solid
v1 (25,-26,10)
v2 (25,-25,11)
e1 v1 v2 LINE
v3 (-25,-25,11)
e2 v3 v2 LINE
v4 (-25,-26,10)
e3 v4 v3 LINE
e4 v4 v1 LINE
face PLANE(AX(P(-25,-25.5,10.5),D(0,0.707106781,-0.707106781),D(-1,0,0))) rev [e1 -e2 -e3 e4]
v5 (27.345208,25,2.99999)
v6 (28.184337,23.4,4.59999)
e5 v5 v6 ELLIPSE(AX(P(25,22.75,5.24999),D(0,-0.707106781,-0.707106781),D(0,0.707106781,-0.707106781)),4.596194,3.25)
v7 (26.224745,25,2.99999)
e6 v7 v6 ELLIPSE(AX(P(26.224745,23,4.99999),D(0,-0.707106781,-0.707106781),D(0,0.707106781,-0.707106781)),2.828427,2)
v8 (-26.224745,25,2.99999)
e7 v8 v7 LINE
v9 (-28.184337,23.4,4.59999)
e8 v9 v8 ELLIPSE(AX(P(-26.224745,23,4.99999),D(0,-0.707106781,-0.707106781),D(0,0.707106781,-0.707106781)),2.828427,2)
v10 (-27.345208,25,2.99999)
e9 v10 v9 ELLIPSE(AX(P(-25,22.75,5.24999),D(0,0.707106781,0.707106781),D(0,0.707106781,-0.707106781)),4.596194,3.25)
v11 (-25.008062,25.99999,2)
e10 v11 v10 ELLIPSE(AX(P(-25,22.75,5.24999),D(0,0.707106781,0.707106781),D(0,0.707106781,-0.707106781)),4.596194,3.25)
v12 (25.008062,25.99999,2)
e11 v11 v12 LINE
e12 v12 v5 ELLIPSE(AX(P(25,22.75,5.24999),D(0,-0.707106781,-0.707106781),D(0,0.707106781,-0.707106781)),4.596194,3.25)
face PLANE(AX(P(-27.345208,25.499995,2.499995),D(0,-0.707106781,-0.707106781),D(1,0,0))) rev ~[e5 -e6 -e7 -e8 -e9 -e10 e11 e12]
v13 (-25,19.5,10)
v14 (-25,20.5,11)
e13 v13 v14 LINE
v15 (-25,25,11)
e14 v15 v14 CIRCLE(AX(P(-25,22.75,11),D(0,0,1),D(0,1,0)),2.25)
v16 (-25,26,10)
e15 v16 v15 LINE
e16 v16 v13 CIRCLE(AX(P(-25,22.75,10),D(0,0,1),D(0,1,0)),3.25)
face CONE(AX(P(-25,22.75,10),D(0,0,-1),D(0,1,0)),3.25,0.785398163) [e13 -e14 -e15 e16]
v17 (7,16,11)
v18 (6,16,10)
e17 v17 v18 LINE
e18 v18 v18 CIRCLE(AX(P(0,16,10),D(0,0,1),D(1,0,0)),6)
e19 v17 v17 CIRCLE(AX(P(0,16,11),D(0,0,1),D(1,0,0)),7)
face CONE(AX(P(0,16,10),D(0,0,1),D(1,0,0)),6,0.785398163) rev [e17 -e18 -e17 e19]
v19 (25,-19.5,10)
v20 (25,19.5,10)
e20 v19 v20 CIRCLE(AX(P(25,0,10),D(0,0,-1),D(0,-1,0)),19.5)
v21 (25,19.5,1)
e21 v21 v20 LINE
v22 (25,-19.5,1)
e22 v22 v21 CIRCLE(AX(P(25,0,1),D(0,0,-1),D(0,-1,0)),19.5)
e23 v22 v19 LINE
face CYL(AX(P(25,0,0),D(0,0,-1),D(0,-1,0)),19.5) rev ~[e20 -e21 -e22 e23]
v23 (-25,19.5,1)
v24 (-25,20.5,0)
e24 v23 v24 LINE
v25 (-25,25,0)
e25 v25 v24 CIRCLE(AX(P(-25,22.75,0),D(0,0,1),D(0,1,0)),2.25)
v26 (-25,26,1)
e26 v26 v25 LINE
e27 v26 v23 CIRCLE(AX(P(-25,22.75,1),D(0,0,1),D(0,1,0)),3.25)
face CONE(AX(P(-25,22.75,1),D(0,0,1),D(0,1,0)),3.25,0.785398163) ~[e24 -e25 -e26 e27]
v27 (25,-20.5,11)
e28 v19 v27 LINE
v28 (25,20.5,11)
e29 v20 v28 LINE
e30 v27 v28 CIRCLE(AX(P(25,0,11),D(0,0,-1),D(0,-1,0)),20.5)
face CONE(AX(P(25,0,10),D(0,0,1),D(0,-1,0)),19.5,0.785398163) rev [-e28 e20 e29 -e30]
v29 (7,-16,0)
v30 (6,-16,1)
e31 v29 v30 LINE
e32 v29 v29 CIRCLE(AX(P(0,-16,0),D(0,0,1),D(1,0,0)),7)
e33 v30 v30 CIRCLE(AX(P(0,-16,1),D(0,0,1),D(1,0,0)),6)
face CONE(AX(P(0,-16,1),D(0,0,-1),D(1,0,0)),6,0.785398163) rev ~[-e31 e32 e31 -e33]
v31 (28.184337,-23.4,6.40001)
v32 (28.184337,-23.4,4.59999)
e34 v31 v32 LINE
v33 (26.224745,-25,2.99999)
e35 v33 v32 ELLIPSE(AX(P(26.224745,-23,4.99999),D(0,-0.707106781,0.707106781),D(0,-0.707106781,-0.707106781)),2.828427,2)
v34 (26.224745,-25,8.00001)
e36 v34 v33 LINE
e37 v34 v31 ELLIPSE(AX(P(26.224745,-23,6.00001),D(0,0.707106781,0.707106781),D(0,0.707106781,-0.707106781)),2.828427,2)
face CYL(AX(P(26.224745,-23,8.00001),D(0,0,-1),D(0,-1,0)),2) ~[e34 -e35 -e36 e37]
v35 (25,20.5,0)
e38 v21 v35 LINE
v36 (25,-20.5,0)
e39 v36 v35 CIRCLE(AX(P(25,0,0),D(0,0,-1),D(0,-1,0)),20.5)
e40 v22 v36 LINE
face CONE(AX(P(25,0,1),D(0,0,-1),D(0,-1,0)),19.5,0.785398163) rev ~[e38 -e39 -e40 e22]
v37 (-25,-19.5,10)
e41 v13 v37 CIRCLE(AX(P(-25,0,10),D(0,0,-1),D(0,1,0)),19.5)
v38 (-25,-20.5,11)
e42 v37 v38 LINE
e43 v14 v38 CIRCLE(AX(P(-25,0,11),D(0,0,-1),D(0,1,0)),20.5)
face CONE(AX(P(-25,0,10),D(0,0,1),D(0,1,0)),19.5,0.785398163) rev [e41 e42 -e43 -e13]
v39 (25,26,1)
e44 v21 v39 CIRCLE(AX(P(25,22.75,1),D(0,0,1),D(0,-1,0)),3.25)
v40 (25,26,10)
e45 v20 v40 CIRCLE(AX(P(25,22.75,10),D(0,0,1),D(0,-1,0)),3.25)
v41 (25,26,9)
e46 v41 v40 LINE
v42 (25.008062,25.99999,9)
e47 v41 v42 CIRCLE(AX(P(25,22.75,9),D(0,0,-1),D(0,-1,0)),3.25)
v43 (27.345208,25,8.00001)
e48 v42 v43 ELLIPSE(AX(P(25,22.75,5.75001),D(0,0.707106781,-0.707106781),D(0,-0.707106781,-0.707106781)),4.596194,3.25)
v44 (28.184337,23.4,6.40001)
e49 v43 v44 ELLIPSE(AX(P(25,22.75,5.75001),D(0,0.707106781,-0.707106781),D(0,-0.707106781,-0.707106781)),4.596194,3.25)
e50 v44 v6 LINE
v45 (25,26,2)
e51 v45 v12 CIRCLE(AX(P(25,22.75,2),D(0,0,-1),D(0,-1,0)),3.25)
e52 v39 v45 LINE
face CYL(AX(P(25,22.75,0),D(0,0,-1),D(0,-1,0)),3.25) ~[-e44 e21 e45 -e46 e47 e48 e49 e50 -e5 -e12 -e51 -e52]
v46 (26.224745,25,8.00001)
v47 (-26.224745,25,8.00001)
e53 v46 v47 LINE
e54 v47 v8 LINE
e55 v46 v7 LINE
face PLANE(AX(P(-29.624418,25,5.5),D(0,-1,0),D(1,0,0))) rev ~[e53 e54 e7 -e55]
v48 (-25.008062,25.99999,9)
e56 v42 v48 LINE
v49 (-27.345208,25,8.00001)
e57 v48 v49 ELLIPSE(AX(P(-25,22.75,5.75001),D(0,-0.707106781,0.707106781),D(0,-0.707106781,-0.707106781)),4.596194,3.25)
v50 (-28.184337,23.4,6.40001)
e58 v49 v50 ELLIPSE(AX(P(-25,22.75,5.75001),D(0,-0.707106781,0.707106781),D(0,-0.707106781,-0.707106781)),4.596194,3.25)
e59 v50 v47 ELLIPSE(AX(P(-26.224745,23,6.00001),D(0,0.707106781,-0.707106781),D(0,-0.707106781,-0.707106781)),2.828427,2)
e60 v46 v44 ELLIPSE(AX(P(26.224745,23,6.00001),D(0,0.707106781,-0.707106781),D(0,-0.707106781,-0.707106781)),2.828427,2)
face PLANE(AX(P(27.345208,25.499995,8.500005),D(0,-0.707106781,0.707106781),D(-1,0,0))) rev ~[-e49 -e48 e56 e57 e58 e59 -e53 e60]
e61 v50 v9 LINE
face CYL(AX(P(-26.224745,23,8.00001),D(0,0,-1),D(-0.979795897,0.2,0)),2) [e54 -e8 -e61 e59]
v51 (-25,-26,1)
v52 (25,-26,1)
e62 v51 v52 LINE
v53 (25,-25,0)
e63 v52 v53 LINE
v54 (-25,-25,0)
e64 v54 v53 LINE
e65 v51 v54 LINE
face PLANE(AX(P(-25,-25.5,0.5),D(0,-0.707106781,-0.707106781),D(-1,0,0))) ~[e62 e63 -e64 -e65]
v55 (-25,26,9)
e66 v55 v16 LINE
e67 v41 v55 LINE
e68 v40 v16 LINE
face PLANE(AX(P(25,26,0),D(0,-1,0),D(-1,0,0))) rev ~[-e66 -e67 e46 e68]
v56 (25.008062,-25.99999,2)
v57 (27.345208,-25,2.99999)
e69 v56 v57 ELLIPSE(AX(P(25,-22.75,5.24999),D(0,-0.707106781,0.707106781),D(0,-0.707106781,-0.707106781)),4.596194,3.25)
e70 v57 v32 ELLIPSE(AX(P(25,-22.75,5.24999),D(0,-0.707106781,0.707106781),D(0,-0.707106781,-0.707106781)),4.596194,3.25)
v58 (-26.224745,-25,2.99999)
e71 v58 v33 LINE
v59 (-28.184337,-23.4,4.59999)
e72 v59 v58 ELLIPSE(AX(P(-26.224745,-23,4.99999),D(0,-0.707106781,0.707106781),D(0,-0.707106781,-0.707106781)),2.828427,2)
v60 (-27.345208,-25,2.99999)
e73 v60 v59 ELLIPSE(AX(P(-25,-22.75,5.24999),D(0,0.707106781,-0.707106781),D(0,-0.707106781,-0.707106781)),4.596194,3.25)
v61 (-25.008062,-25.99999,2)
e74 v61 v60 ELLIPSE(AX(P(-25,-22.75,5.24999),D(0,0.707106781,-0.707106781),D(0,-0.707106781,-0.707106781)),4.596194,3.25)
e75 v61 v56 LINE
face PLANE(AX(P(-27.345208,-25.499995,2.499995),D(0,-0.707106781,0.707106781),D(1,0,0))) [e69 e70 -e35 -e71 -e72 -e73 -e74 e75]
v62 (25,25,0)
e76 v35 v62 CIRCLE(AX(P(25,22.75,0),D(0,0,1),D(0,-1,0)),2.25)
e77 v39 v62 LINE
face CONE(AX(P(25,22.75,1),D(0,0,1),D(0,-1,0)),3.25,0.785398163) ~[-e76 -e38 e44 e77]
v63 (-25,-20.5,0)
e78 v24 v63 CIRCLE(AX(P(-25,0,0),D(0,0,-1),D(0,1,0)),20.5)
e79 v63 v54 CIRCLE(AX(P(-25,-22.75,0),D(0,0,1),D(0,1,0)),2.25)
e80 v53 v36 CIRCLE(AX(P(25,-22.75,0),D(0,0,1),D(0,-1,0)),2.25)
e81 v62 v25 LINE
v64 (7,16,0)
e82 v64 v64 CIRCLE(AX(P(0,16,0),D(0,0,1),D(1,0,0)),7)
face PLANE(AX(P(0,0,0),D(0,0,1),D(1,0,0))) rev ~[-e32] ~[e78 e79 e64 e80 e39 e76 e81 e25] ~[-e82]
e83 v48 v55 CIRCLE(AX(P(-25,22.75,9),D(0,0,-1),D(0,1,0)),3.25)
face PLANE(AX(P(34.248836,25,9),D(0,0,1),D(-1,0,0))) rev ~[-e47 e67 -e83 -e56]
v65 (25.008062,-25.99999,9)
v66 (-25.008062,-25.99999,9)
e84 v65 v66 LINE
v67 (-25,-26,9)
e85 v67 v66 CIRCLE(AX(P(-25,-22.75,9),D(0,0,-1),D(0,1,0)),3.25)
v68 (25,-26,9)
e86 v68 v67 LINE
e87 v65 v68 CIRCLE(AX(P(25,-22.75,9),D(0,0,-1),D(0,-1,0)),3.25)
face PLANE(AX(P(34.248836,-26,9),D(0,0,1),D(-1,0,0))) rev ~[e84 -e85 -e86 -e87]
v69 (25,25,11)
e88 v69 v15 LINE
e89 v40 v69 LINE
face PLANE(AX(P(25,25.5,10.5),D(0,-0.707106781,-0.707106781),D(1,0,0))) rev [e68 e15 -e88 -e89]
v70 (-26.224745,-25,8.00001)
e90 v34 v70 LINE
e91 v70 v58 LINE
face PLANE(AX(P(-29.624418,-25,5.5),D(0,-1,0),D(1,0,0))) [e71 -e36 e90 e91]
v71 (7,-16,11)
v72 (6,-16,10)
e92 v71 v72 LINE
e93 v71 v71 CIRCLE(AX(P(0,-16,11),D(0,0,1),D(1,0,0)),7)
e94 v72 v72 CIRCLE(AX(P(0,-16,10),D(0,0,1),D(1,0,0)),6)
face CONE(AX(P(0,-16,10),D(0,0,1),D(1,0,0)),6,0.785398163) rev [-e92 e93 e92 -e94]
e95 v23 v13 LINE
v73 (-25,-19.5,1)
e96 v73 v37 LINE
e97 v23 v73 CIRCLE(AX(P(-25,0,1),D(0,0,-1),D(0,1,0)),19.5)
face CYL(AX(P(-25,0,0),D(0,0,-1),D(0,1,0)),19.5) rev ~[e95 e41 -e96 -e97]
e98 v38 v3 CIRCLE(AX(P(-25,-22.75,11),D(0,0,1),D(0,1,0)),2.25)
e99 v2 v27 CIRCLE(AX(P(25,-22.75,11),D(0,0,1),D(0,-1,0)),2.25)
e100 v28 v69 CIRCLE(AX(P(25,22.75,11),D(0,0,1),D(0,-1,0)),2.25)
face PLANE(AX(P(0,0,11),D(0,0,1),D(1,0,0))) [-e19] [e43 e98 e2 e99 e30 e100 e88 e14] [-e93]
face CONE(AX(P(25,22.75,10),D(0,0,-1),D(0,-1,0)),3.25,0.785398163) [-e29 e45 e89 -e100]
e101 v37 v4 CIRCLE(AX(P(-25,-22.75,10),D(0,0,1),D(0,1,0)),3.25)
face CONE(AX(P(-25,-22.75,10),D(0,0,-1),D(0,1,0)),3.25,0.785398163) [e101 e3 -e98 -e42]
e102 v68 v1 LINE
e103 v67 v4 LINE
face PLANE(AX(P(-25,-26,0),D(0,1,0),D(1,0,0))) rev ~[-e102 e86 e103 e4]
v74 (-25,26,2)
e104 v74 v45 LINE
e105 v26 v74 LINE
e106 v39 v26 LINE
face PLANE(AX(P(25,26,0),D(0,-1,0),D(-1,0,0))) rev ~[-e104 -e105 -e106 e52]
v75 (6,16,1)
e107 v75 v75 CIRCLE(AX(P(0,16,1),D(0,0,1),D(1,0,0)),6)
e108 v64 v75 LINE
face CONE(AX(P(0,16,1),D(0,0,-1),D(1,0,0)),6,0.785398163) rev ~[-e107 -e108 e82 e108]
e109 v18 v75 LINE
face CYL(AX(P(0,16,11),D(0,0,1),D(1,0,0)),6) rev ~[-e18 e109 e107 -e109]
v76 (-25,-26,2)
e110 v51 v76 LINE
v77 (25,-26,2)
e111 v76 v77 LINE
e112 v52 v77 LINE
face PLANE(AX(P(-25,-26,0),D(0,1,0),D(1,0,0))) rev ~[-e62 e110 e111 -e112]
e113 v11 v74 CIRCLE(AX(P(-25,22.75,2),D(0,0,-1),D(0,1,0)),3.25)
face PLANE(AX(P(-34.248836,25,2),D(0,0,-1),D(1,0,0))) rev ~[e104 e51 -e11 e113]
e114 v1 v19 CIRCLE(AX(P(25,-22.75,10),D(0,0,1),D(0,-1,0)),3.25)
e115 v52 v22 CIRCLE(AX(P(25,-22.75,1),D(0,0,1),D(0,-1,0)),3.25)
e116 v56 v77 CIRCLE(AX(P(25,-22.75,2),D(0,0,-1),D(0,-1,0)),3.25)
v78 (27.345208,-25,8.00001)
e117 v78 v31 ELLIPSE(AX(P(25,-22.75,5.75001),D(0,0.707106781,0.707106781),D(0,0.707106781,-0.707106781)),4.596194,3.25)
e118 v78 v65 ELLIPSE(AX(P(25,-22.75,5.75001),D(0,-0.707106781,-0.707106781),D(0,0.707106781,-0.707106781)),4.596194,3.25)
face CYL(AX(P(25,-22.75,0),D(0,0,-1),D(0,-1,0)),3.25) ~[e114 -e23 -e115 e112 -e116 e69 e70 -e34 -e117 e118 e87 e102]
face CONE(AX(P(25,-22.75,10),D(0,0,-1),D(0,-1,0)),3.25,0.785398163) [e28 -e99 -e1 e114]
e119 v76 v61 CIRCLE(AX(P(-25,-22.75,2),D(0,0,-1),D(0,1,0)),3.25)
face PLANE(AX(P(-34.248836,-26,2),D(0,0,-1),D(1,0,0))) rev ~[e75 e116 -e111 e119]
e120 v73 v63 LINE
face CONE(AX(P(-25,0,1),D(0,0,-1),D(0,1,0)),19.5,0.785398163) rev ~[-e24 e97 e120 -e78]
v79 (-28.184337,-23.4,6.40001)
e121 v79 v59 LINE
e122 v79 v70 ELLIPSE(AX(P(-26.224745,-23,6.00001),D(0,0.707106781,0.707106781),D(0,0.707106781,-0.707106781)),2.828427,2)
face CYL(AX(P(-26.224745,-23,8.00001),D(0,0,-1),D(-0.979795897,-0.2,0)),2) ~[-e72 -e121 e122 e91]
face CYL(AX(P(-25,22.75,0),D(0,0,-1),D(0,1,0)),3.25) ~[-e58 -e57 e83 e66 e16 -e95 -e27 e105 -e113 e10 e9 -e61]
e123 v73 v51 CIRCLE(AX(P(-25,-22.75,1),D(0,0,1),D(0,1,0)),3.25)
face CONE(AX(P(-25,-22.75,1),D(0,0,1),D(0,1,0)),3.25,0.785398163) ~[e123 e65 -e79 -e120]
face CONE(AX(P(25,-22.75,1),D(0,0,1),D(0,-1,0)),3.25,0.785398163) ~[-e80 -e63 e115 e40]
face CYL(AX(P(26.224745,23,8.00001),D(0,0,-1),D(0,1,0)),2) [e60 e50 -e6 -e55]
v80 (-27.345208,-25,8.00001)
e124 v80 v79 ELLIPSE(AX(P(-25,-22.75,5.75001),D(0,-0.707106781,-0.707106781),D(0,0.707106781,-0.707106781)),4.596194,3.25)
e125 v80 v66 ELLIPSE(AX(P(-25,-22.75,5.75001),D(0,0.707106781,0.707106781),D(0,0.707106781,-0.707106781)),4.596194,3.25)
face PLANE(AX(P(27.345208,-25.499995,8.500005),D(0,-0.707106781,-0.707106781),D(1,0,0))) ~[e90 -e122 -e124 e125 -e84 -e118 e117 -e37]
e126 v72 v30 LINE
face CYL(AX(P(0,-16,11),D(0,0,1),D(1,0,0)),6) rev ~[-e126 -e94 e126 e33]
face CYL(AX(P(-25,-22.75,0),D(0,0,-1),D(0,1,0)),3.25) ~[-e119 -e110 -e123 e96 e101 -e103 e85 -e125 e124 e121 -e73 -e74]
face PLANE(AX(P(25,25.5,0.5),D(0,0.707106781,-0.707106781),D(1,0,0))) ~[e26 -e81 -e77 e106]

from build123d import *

# Parameters (mm, degrees)
F1_DEPTH  = 11
F2_W      = 9.2488363385
F2_H      = 7
F2_W_2    = 50
F3_DEPTH  = 1
F6_SIZE   = 1
F7_SIZE   = 0.99999
F8_R      = 2
F9_R      = 6
F10_DEPTH = 11.001
F11_SIZE  = 1


# Not quite as in the source:
# - a fillet or chamfer is up to 0.001 mm smaller than in the source, because OpenCascade refuses the exact size


with BuildPart() as f1:
    # F0 (on Top) → F1 (new body)
    with BuildSketch(Plane.XY):
        with BuildLine():
            ThreePointArc((-25, 19.5), (-5.5, 0), (-25, -19.5))
            ThreePointArc((-25, -19.5), (-28.25, -22.75), (-25, -26))
            Line((-25, -26), (25, -26))
            ThreePointArc((25, -26), (28.25, -22.75), (25, -19.5))
            ThreePointArc((25, -19.5), (5.5, 0), (25, 19.5))
            ThreePointArc((25, 19.5), (28.25, 22.75), (25, 26))
            Line((25, 26), (-25, 26))
            ThreePointArc((-25, 26), (-28.25, 22.75), (-25, 19.5))
        make_face()
        with BuildLine():
            ThreePointArc((-25, -24), (-26.25, -22.75), (-25, -21.5))
            ThreePointArc((-25, -21.5), (-3.5, 0), (-25, 21.5))
            ThreePointArc((-25, 21.5), (-26.25, 22.75), (-25, 24))
            Line((-25, 24), (25, 24))
            ThreePointArc((25, 24), (26.25, 22.75), (25, 21.5))
            ThreePointArc((25, 21.5), (3.5, 0), (25, -21.5))
            ThreePointArc((25, -21.5), (26.25, -22.75), (25, -24))
            Line((25, -24), (-25, -24))
        make_face(mode=Mode.SUBTRACT)
        with BuildLine():
            ThreePointArc((-25, 21.5), (-3.5, 0), (-25, -21.5))
            ThreePointArc((-25, -21.5), (-26.25, -22.75), (-25, -24))
            Line((-25, -24), (25, -24))
            ThreePointArc((25, -24), (26.25, -22.75), (25, -21.5))
            ThreePointArc((25, -21.5), (3.5, 0), (25, 21.5))
            ThreePointArc((25, 21.5), (26.25, 22.75), (25, 24))
            Line((25, 24), (-25, 24))
            ThreePointArc((-25, 24), (-26.25, 22.75), (-25, 21.5))
        make_face()
    extrude(amount=F1_DEPTH)


with BuildPart() as f3:
    # F2 (on face) → F3 (new body)
    with BuildSketch(Plane.XZ.offset(26)):
        with Locations((-29.6244181693, 5.5)):
            Rectangle(F2_W, F2_H)
        with Locations((0, 5.5)):
            Rectangle(F2_W_2, F2_H)
        with Locations((29.6244181693, 5.5)):
            Rectangle(F2_W, F2_H)
    extrude(amount=-F3_DEPTH)


with BuildPart() as f4_1:
    # F4: copy of F3
    add(f3.part.moved(Location((0, 51, 0))))


with BuildPart() as f1_1:
    add(f1.part)

    # F5: cut F4_1, F3
    add(f4_1.part, mode=Mode.SUBTRACT)
    add(f3.part, mode=Mode.SUBTRACT)

    # F6
    f6_edges = [f1_1.edges().sort_by_distance(p)[0] for p in [
        (-5.5, 0, 11),
        (-5.5, 0, 0),
    ]]
    chamfer(f6_edges, length=F6_SIZE)

    # F7 (size 1 in the source; OpenCascade refuses exactly that, so slightly less here)
    f7_edges = [f1_1.edges().sort_by_distance(p)[0] for p in [
        (0, -25, 9),
        (0, -25, 2),
        (0, 25, 9),
        (0, 25, 2),
    ]]
    chamfer(f7_edges, length=F7_SIZE)

    # F8
    f8_edges = [f1_1.edges().sort_by_distance(p)[0] for p in [
        (27.345208, 25, 5.5),
        (-27.345208, 25, 5.5),
        (-27.345208, -25, 5.5),
        (27.345208, -25, 5.5),
    ]]
    fillet(f8_edges, radius=F8_R)

    # F9 (on face) → F10 (cut, through all)
    with BuildSketch(Plane.XY.offset(11)):
        with Locations((0, -16)):
            Circle(F9_R)
        with Locations((0, 16)):
            Circle(F9_R)
    extrude(amount=-F10_DEPTH, mode=Mode.SUBTRACT)

    # F11
    f11_edges = [f1_1.edges().sort_by_distance(p)[0] for p in [
        (-6, 16, 11),
        (-6, -16, 11),
        (-6, -16, 0),
        (-6, 16, 0),
    ]]
    chamfer(f11_edges, length=F11_SIZE)


solid = f1_1.part
